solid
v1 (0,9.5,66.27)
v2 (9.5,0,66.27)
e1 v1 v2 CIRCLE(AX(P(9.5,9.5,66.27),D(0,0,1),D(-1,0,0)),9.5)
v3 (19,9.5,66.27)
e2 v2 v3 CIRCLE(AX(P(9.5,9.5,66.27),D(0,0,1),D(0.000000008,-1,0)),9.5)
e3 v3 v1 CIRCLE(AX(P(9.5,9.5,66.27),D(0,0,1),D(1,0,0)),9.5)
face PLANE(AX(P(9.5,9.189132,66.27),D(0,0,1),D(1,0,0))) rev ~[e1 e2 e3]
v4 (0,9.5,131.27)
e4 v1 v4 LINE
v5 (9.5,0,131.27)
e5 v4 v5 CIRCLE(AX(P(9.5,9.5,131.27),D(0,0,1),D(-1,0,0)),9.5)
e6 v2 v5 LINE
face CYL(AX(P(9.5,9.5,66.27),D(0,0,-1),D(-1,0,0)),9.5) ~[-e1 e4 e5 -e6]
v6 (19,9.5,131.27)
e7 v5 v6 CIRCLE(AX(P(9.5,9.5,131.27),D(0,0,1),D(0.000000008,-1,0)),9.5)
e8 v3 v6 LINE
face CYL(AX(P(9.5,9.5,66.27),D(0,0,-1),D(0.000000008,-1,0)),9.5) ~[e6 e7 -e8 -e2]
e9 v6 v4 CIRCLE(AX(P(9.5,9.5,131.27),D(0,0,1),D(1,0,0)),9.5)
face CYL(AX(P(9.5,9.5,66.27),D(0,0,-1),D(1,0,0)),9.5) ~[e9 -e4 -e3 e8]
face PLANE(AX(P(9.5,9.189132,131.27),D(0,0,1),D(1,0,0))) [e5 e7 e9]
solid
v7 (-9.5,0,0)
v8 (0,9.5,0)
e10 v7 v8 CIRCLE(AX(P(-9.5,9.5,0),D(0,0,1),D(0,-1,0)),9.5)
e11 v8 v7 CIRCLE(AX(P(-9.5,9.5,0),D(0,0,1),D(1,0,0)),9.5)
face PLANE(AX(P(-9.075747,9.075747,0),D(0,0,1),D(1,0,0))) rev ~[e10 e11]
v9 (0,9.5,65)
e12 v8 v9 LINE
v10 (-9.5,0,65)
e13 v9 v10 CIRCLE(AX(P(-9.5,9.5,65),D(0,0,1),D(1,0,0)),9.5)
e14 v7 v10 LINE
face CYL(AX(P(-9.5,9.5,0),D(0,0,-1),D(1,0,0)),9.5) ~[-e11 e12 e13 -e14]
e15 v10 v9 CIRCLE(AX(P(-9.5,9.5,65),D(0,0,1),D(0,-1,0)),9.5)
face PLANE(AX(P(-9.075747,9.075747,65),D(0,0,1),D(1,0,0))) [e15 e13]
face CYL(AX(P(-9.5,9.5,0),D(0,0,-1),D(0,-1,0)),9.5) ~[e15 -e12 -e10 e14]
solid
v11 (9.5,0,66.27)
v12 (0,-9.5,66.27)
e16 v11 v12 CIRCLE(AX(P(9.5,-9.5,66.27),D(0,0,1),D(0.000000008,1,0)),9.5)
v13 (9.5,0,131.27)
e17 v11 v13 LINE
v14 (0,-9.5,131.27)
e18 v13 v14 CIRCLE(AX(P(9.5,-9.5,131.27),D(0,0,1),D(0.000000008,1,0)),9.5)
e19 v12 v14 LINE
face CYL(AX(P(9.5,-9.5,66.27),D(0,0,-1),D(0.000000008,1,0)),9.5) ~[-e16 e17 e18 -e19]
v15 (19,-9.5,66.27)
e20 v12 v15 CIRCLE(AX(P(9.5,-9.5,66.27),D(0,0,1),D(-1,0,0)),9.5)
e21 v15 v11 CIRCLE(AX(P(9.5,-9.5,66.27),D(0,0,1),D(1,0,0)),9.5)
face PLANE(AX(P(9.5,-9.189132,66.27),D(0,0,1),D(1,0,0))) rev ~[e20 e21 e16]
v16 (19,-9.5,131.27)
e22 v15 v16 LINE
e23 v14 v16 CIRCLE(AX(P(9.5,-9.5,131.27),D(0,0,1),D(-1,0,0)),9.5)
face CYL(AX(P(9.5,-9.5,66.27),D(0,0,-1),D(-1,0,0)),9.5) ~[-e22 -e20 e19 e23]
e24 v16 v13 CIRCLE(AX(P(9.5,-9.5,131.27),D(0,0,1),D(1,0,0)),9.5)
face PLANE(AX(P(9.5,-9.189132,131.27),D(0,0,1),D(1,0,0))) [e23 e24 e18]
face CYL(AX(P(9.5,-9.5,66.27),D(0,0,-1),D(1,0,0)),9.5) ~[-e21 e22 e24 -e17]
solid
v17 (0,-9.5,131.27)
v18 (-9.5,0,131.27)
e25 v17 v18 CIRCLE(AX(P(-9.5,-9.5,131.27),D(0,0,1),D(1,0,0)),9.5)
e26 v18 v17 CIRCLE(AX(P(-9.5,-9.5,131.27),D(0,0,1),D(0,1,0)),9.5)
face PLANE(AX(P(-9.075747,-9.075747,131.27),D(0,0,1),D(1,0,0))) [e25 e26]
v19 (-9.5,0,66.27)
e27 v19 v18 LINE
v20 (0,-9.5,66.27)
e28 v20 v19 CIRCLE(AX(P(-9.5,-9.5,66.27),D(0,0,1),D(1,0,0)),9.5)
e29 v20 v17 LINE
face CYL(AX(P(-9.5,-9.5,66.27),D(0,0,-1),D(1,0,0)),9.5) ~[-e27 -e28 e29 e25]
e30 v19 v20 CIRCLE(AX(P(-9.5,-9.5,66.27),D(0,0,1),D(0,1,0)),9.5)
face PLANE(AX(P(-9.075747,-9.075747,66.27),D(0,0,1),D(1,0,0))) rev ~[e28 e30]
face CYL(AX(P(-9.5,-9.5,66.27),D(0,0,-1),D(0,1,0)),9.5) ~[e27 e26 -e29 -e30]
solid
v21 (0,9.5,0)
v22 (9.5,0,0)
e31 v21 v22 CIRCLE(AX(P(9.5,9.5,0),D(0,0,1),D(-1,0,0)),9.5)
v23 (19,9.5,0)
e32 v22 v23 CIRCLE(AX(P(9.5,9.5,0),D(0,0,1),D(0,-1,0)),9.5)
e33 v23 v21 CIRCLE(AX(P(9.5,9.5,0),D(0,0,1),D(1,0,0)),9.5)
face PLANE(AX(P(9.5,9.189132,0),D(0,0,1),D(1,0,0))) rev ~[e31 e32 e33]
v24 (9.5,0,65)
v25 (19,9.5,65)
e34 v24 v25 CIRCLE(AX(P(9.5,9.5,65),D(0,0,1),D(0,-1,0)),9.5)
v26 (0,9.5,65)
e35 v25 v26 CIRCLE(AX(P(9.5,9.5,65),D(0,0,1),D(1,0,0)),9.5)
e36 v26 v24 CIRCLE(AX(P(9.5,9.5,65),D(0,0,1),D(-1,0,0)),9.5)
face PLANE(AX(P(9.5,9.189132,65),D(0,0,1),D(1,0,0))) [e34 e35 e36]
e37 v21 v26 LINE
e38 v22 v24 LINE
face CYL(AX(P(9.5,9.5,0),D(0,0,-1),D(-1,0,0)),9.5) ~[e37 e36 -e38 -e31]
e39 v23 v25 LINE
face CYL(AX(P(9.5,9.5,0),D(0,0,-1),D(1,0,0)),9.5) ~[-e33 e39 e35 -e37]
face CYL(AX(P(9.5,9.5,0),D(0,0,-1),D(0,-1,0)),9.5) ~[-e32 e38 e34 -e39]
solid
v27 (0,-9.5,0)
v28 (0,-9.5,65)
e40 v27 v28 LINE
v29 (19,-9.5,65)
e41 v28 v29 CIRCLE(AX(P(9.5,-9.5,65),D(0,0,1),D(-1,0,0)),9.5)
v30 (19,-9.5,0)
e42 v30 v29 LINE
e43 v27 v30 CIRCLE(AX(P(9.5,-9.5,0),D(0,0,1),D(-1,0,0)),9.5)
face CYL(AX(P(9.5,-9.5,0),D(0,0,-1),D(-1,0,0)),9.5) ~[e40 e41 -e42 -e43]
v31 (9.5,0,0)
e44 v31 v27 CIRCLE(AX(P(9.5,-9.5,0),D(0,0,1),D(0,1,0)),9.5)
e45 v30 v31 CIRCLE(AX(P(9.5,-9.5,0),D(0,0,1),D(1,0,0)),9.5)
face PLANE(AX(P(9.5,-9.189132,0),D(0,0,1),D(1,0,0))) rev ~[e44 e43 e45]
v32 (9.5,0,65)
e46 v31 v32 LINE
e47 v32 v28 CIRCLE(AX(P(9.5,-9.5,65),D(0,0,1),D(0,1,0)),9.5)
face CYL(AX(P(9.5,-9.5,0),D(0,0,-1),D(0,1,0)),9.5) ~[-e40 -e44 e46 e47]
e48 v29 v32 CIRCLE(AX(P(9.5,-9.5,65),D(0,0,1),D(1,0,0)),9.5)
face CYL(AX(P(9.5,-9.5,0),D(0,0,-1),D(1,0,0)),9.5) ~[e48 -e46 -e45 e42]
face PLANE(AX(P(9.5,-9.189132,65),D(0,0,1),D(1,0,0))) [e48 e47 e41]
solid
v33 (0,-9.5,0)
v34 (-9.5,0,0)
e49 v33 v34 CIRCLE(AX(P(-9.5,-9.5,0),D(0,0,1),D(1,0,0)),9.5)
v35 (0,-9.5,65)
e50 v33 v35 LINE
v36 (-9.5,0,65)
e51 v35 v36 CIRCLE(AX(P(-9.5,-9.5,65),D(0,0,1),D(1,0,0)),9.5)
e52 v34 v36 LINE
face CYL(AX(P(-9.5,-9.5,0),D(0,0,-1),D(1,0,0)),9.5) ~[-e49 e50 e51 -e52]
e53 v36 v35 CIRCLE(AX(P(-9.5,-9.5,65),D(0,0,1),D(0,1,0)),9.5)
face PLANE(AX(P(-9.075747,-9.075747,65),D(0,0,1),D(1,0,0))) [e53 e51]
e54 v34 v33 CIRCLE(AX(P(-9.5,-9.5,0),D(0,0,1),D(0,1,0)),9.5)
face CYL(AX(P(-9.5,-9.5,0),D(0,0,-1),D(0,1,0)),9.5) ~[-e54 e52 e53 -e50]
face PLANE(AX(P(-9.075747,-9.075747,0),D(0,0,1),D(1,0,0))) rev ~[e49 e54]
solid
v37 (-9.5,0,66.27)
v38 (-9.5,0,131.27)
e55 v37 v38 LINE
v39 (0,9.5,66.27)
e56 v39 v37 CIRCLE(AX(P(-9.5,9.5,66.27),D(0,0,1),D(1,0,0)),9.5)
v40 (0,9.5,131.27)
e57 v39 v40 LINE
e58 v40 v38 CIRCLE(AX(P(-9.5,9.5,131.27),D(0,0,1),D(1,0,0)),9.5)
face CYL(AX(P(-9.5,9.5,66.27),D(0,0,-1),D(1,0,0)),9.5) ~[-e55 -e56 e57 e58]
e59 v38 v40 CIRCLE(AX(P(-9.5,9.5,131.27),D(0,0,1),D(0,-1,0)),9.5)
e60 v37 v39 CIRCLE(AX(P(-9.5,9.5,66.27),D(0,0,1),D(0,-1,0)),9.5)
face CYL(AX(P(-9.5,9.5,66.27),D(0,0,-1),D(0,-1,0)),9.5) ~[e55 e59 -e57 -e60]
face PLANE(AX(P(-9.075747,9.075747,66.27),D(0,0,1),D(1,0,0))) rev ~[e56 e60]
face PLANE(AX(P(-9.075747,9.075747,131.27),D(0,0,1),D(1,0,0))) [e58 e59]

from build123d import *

# Parameters (mm, degrees)
F1_DEPTH = 65
F4_DEPTH = 65


with BuildPart() as f1:
    # F0 (on Top) → F1 (new body)
    with BuildSketch(Plane.XY):
        with BuildLine():
            ThreePointArc((19, 9.5), (9.5, 19), (0, 9.5))
            ThreePointArc((0, 9.5), (2.7824855787, 2.7824855787), (9.5, 0))
            ThreePointArc((9.5, 0), (16.2175144213, 2.7824855787), (19, 9.5))
        make_face()
    extrude(amount=F1_DEPTH)


with BuildPart() as f1b:
    # F0 (on Top) → F1, piece 2 (new body)
    with BuildSketch(Plane.XY):
        with BuildLine():
            ThreePointArc((19, -9.5), (16.2175144213, -2.7824855787), (9.5, 0))
            ThreePointArc((9.5, 0), (2.7824855787, -2.7824855787), (0, -9.5))
            ThreePointArc((0, -9.5), (9.5, -19), (19, -9.5))
        make_face()
    extrude(amount=F1_DEPTH)


with BuildPart() as f1c:
    # F0 (on Top) → F1, piece 3 (new body)
    with BuildSketch(Plane.XY):
        with BuildLine():
            ThreePointArc((0, -9.5), (-2.7824855787, -2.7824855787), (-9.5, 0))
            ThreePointArc((-9.5, 0), (-16.2175144213, -16.2175144213), (0, -9.5))
        make_face()
    extrude(amount=F1_DEPTH)


with BuildPart() as f1d:
    # F0 (on Top) → F1, piece 4 (new body)
    with BuildSketch(Plane.XY):
        with BuildLine():
            ThreePointArc((-9.5, 0), (-2.7824855787, 2.7824855787), (0, 9.5))
            ThreePointArc((0, 9.5), (-16.2175144213, 16.2175144213), (-9.5, 0))
        make_face()
    extrude(amount=F1_DEPTH)


with BuildPart() as f4:
    # F3 (on offset) → F4 (new body)
    with BuildSketch(Plane.XY.offset(66.27)):
        with BuildLine():
            ThreePointArc((0, 9.5), (2.7824856048, 2.7824855527), (9.5000000736, 0))
            ThreePointArc((9.5000000736, 0), (16.2175144473, 2.7824856048), (19, 9.5))
            ThreePointArc((19, 9.5), (9.5, 19), (0, 9.5))
        make_face()
    extrude(amount=F4_DEPTH)


with BuildPart() as f4b:
    # F3 (on offset) → F4, piece 2 (new body)
    with BuildSketch(Plane.XY.offset(66.27)):
        with BuildLine():
            ThreePointArc((9.5000000736, 0), (2.7824856048, -2.7824855527), (0, -9.5))
            ThreePointArc((0, -9.5), (9.5, -19), (19, -9.5))
            ThreePointArc((19, -9.5), (16.2175144473, -2.7824856048), (9.5000000736, 0))
        make_face()
    extrude(amount=F4_DEPTH)


with BuildPart() as f4c:
    # F3 (on offset) → F4, piece 3 (new body)
    with BuildSketch(Plane.XY.offset(66.27)):
        with BuildLine():
            ThreePointArc((-9.4999999957, 0), (-16.2175144228, -16.2175144197), (0, -9.5))
            ThreePointArc((0, -9.5), (-2.7824855772, -2.7824855803), (-9.4999999957, 0))
        make_face()
    extrude(amount=F4_DEPTH)


with BuildPart() as f4d:
    # F3 (on offset) → F4, piece 4 (new body)
    with BuildSketch(Plane.XY.offset(66.27)):
        with BuildLine():
            ThreePointArc((0, 9.5), (-16.2175144228, 16.2175144197), (-9.4999999957, 0))
            ThreePointArc((-9.4999999957, 0), (-2.7824855772, 2.7824855803), (0, 9.5))
        make_face()
    extrude(amount=F4_DEPTH)


solid = Compound([f1.part, f1b.part, f1c.part, f1d.part, f4.part, f4b.part, f4c.part, f4d.part])
